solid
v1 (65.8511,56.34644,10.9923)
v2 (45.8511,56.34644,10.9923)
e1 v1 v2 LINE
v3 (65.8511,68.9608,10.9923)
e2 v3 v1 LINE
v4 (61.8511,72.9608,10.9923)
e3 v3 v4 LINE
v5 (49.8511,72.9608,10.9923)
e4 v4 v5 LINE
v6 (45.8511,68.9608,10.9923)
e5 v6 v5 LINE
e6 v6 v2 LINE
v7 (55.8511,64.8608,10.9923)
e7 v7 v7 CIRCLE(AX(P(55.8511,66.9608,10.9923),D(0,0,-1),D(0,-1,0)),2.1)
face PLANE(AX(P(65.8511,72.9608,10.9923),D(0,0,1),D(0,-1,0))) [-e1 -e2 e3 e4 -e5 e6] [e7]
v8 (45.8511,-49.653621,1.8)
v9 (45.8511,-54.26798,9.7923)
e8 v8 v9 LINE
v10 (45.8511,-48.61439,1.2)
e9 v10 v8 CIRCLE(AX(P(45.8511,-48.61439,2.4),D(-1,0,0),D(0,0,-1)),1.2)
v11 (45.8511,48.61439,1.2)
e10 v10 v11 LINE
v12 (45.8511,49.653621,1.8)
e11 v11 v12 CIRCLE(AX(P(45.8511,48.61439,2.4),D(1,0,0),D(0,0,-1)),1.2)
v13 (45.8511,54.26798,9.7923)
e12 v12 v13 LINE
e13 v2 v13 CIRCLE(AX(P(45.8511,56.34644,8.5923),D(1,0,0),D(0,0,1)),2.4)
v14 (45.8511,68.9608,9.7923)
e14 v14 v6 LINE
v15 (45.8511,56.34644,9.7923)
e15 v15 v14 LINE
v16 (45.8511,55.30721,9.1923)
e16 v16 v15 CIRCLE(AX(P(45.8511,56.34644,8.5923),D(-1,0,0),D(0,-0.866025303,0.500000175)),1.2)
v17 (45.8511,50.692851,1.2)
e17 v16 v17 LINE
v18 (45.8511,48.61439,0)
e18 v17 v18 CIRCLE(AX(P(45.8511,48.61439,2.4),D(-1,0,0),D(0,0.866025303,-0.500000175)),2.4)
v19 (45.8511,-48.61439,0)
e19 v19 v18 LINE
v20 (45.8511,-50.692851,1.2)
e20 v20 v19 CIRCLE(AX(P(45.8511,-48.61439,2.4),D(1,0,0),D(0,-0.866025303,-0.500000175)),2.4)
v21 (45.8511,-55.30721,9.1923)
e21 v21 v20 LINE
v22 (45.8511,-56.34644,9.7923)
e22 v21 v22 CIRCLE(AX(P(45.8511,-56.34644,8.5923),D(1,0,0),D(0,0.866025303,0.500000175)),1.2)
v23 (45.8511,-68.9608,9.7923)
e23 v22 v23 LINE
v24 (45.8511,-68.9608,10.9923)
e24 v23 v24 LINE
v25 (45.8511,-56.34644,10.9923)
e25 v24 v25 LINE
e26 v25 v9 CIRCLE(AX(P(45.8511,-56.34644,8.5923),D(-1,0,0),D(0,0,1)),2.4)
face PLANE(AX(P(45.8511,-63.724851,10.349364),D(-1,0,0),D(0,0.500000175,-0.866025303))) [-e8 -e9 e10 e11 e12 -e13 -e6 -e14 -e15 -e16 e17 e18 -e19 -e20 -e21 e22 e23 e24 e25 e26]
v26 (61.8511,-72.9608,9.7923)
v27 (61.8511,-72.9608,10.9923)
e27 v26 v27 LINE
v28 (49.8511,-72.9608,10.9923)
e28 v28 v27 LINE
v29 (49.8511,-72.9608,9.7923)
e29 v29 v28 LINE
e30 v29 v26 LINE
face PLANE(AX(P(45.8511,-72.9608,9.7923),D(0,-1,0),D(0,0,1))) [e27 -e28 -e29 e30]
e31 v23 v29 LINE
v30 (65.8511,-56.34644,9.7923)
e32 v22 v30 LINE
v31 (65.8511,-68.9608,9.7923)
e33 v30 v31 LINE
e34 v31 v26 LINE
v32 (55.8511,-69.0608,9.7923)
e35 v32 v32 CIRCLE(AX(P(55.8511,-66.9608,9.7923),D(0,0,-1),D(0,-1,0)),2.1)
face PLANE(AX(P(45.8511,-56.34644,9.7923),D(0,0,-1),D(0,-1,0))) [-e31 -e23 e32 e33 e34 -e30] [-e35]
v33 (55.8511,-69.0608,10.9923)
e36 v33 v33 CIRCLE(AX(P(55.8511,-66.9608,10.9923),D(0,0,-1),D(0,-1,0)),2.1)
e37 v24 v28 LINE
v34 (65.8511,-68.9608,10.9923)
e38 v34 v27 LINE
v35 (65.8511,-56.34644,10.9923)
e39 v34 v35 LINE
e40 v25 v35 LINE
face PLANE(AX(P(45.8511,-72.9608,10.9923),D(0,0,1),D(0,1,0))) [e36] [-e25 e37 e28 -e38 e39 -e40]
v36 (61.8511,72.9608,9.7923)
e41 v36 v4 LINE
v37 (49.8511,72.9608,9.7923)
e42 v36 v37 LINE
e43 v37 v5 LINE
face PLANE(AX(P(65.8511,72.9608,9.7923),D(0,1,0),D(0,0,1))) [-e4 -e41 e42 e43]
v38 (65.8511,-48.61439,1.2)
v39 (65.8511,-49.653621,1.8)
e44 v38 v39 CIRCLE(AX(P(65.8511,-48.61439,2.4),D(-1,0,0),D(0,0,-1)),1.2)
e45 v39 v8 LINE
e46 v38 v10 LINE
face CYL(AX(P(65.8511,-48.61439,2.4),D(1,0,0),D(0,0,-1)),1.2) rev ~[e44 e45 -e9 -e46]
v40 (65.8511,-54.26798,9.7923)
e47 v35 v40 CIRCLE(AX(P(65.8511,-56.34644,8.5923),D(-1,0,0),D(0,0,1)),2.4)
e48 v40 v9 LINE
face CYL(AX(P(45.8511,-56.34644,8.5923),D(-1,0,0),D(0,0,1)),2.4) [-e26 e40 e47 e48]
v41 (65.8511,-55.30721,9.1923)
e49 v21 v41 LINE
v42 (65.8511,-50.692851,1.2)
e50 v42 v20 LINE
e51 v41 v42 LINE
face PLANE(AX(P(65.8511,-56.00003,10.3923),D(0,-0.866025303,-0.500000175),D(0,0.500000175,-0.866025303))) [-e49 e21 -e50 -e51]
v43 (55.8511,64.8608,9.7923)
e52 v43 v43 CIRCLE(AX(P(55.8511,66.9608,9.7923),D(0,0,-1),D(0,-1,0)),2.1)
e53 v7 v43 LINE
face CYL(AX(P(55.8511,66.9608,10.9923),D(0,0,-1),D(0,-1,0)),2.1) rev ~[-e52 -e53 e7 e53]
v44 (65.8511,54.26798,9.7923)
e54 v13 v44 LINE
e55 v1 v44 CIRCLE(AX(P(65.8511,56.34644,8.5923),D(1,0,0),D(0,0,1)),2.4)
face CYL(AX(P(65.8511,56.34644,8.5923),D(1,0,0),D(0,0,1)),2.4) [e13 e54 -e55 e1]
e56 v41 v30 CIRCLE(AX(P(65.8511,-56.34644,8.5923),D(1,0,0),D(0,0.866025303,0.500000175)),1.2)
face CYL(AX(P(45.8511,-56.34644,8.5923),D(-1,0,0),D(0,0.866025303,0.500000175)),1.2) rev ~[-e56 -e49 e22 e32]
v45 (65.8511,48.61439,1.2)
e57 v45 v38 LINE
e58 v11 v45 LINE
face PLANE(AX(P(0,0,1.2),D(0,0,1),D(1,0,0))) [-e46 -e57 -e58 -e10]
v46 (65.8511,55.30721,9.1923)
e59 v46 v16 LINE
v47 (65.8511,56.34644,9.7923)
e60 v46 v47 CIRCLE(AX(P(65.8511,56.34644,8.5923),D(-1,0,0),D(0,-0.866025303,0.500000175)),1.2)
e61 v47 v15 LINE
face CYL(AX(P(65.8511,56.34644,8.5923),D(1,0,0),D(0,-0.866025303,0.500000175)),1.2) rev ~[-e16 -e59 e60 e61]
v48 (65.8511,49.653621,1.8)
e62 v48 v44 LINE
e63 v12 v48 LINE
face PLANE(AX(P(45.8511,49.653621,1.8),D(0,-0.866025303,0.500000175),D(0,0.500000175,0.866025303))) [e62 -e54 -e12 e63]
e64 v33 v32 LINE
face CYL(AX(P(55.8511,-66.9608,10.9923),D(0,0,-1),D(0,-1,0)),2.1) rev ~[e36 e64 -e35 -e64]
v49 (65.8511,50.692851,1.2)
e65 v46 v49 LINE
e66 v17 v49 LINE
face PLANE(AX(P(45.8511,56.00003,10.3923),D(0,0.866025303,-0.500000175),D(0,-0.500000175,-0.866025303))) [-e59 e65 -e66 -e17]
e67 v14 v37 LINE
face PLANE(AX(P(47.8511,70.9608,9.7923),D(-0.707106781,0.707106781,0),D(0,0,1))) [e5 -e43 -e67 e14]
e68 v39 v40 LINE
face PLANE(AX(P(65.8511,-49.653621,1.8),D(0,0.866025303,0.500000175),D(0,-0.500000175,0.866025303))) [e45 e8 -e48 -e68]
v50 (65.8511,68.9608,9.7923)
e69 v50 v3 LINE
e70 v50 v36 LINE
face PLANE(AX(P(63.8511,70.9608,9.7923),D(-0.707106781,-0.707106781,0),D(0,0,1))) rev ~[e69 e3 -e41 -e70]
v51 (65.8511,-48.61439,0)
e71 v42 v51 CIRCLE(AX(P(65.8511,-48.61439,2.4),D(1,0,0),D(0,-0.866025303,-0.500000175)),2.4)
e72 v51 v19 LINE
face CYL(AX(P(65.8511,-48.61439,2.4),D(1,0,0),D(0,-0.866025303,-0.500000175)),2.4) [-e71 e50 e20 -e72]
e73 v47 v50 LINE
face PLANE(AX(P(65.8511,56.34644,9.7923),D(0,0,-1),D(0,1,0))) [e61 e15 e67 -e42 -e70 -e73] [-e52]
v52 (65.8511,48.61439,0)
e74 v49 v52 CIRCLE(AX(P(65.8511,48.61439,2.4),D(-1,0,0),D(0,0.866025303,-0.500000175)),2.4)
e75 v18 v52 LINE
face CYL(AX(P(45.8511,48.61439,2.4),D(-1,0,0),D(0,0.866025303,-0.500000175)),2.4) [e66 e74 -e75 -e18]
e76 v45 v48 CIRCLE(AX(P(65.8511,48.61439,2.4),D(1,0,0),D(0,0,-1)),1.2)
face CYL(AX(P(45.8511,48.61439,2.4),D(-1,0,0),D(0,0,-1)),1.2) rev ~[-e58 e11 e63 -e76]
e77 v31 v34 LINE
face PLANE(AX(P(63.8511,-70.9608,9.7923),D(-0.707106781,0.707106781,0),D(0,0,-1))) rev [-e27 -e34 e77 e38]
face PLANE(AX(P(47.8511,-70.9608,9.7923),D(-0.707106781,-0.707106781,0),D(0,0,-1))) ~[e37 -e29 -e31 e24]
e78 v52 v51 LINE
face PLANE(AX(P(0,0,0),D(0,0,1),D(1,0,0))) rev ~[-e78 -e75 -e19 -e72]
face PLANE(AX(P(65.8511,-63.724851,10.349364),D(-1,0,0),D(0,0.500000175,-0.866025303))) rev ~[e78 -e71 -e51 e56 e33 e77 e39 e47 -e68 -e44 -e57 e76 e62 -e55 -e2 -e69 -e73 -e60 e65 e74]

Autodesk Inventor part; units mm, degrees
ref_plane "YZ Plane" through (0, 0, 0) normal (1, 0, 0) x (0, 1, 0)
ref_plane "XZ Plane" through (0, 0, 0) normal (0, 1, 0) x (-1, 0, 0)
ref_plane "XY Plane" through (0, 0, 0) normal (0, 0, 1) x (1, 0, 0)
sketch "Sketch1" plane through (0, 0, 0) normal (0, 0, 1) x (1, 0, 0)
  line L0 (45.8511, 50) -> (65.8511, 50)
  line L1 (65.8511, 50) -> (65.8511, -50)
  line L2 (65.8511, -50) -> (45.8511, -50)
  line L3 (45.8511, -50) -> (45.8511, 50)
  line L4 (45.8511, 50) -> (65.8511, -50) construction
  line L5 (65.8511, 50) -> (45.8511, -50) construction
  line L6 (100.8511, 74.3) -> (100.8511, -74.3)
  point P0 (0, 0)
  point P1 (55.8511, 0)
  point P2 (55.8511, 0)
  dimension "d0" = 100
  dimension "d1" = 20
  dimension "d36" = 45
extrude "Plate1" add sketch "Sketch1" along normal blind 1.2
sketch "Sketch2" plane through (65.8511, -48.9608, 0.6) normal (0, -0.8660254, -0.5) x (1, 0, 0)
  line L0 (-20, 0) -> (0, 0)
  line L1 (0, 0) -> (0, 12)
  line L2 (0, 12) -> (-20, 12)
  line L3 (-20, 12) -> (-20, 0)
edge flange "Flange1" height 12 angle 60 thickness 1.2 bend radius 1.2 thickness toward (0, -0.8660254, -0.5) relief tear relief width 1.2 relief depth 0.6 corner gap 1.2 corner form 0 edges at (55.8511, -50, 1.2) (55.8511, 50, 1.2) wall of the first edge with corners at (45.8511, -48.9608, 0.6) (65.8511, -48.9608, 0.6) (65.8511, -54.9608, 10.9923) (45.8511, -54.9608, 10.9923)
bend "Bend1"
corner "Corner1"
sketch "Sketch3" plane through (45.8511, -54.9608, 9.7923) normal (0, 0, 1) x (1, 0, 0)
  line L0 (20, 0) -> (0, 0)
  line L1 (0, 0) -> (0, -18)
  line L2 (0, -18) -> (20, -18)
  line L3 (20, -18) -> (20, 0)
edge flange "Flange2" height 18 angle 60 thickness 1.2 bend radius 1.2 thickness toward (0, 0, 1) relief tear relief width 1.2 relief depth 0.6 corner gap 1.2 corner form 0 edges at (55.8511, -56, 10.3923) (55.8511, 56, 10.3923) wall of the first edge with corners at (65.8511, -54.9608, 9.7923) (45.8511, -54.9608, 9.7923) (45.8511, -72.9608, 9.7923) (65.8511, -72.9608, 9.7923)
bend "Bend2"
corner "Corner2"
chamfer "Corner Chamfer1" distance 4 angle 45 4 edges at (45.8511, -72.9608, 10.3923) (65.8511, -72.9608, 10.3923) (45.8511, 72.9608, 10.3923) (65.8511, 72.9608, 10.3923)
sketch "Sketch4" plane through (45.8511, -56.3464, 10.9923) normal (0, 0, 1) x (1, 0, 0)
  line L0 (4, 129.3072) -> (16, 129.3072) projected
  line L1 (16, -16.6144) -> (4, -16.6144) projected
  point P0 (-45.8511, 56.3464)
  point P1 (10, -10.6144)
  point P2 (10, 123.3072)
  point P3 (10, 129.3072)
  point P4 (10, -16.6144)
  dimension "d27" = 6
  dimension "d28" = 6
hole "Hole1" at (55.8511, -66.9608, 10.9923) at (55.8511, 66.9608, 10.9923) direction (0, 0, -1) diameter 4.2 depth 1.2 tip angle 118
equation "\"d34\" = Thickness"
equation "\"d4\" = BendReliefWidth"
equation "\"d5\" = BendReliefDepth"
equation "\"d6\" = MinimumRemnant"
equation "\"d7\" = BendRadius"
equation "\"d10\" = BendRadius"
equation "\"d11\" = CornerReliefSize"
equation "\"d12\" = GapSize"
equation "\"d13\" = JacobiRadiusSize"
equation "\"d14\" = BendReliefWidth"
equation "\"d15\" = BendReliefDepth"
equation "\"d16\" = MinimumRemnant"
equation "\"d17\" = BendRadius"
equation "\"d20\" = BendRadius"
equation "\"d21\" = CornerReliefSize"
equation "\"d22\" = GapSize"
equation "\"d23\" = JacobiRadiusSize"
equation "\"BendRadius\" = Thickness"
equation "\"BendReliefWidth\" = Thickness"
equation "\"BendReliefDepth\" = 0.5 * Thickness"
equation "\"CornerReliefSize\" = 4 * Thickness"
equation "\"MinimumRemnant\" = 2 * Thickness"
equation "\"TransitionRadius\" = BendRadius"
equation "\"JacobiRadiusSize\" = BendRadius"
equation "\"GapSize\" = Thickness"
equation "\"d3\" = BendRadius"
equation "\"Thickness\" = 1.2"
